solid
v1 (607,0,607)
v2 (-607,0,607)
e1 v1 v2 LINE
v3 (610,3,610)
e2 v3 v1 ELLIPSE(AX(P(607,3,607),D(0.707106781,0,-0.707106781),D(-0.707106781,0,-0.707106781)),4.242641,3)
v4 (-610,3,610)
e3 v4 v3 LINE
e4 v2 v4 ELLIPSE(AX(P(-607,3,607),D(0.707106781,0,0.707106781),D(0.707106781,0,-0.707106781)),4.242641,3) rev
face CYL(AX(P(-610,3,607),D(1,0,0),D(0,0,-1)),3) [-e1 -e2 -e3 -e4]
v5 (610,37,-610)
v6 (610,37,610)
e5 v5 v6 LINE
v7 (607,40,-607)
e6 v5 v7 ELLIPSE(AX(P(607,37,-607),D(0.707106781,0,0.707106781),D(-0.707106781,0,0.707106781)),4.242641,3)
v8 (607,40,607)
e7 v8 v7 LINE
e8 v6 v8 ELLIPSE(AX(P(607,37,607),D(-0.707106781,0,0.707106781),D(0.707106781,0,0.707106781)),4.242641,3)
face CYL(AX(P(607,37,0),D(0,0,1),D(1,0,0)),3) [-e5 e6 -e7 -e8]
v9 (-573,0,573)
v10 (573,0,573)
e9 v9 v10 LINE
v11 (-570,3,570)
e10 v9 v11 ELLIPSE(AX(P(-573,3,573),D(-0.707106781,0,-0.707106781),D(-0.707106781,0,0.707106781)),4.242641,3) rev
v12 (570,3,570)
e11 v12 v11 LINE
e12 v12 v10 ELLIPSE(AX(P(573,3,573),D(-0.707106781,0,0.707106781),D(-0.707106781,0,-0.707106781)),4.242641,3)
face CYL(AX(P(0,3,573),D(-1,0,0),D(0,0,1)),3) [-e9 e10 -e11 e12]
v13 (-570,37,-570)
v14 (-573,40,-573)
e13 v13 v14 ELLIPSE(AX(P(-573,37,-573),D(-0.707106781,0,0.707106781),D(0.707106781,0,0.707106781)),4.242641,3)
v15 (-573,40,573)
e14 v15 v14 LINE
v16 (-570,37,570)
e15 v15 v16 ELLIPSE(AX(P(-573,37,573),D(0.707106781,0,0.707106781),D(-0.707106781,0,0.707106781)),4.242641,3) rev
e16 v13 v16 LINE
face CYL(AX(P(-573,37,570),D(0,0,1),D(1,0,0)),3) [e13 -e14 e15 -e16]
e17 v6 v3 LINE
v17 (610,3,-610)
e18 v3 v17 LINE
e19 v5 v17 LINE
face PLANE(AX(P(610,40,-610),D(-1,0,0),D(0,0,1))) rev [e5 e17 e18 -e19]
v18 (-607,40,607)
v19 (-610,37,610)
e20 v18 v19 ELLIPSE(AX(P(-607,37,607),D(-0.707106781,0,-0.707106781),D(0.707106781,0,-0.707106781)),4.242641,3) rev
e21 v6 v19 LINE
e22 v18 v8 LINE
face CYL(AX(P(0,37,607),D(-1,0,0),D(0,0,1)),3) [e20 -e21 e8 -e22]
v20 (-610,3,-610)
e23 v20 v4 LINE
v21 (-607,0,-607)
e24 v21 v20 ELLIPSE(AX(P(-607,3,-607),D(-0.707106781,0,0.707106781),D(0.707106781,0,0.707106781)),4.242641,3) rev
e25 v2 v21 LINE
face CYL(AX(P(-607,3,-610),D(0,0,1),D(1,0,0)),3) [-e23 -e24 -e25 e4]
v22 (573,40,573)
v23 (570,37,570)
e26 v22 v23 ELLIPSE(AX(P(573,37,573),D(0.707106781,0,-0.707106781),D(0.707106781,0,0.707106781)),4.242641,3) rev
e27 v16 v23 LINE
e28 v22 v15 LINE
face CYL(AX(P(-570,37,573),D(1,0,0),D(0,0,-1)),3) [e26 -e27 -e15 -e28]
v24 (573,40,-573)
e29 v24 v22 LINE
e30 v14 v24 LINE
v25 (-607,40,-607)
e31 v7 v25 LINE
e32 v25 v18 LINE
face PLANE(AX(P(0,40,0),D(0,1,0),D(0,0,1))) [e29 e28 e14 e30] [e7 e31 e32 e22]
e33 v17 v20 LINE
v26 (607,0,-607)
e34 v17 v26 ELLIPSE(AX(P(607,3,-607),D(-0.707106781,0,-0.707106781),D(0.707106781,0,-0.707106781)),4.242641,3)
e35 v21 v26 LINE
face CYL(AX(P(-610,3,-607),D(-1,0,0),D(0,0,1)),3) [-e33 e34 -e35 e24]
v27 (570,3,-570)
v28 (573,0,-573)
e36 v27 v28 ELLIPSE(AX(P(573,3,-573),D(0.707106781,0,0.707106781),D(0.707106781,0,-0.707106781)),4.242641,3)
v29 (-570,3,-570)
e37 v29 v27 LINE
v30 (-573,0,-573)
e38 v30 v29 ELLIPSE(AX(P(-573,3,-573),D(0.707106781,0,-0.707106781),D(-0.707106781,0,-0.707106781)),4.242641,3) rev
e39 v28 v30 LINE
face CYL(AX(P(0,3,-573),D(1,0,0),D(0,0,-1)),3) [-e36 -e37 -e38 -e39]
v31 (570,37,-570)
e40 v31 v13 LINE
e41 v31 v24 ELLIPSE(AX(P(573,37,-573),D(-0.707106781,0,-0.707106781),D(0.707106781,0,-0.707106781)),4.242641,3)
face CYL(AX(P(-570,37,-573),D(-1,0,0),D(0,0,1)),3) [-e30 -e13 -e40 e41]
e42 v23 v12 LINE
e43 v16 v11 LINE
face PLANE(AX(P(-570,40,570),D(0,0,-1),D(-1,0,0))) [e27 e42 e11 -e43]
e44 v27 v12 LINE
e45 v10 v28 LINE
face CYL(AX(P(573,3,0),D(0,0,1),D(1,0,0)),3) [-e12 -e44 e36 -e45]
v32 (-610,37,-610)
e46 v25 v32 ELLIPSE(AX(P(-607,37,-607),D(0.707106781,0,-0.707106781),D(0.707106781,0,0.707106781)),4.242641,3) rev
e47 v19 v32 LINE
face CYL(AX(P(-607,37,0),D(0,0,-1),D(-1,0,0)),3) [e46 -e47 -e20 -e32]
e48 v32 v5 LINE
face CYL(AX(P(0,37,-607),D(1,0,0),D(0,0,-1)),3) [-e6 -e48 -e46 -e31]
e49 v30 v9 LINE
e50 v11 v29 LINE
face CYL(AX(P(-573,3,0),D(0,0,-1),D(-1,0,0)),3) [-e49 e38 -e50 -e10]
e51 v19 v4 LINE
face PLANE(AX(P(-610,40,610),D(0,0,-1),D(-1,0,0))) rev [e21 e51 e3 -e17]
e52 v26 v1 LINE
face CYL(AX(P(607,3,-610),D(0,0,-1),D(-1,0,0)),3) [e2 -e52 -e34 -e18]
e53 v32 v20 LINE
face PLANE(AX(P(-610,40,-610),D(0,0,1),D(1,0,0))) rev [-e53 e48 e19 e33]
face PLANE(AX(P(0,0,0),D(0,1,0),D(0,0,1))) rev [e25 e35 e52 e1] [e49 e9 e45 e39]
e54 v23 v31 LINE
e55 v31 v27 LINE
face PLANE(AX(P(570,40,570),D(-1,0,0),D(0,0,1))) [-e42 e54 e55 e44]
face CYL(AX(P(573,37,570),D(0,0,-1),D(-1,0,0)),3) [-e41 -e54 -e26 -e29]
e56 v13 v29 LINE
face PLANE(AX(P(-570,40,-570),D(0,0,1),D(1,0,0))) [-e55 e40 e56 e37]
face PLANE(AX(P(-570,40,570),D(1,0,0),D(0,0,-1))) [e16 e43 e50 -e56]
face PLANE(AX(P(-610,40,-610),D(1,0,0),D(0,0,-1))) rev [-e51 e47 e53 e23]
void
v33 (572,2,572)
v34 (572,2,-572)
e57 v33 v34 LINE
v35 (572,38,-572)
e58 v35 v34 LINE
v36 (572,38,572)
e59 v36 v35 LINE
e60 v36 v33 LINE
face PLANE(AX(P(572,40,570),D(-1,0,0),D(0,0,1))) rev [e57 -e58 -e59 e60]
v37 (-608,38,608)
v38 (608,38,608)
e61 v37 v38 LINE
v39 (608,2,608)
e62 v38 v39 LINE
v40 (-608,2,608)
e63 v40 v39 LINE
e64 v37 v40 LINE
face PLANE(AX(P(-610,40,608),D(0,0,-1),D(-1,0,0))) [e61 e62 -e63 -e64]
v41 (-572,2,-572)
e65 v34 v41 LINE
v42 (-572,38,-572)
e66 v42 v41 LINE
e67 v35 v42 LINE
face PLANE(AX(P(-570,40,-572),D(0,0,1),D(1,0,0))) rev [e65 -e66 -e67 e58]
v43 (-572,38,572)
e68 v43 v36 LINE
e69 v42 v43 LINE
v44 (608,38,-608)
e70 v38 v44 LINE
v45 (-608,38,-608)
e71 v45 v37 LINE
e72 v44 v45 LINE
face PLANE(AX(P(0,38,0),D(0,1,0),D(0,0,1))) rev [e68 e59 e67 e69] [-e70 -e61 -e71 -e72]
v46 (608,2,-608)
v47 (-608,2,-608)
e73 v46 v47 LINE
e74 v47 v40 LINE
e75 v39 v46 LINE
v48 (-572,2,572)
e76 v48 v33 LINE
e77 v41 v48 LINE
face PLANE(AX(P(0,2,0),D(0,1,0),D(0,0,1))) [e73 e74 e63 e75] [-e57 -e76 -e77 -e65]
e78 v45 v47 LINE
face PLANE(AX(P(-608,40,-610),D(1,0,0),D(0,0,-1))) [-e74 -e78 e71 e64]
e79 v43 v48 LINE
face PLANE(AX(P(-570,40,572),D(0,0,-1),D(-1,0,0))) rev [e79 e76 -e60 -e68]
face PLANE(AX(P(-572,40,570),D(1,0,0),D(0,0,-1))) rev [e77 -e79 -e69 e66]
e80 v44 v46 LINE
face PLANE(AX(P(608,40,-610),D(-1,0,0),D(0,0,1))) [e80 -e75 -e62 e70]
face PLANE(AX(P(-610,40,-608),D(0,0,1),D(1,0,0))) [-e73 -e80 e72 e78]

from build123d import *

# Parameters (mm, degrees)
SKETCH1_W           = 1220
SKETCH1_H           = 1220
SKETCH1_W_2         = 1140
SKETCH1_H_2         = 1140
BOSS_EXTRUDE1_DEPTH = 40
SHELL1_START        = 2
SHELL1_OUTLINE_W    = 1216
SHELL1_OUTLINE_H    = 1216
SHELL1_OUTLINE_W_2  = 1144
SHELL1_OUTLINE_H_2  = 1144
SHELL1_DEPTH        = 36
FILLET1_R           = 3


# Read off the part's stored shape, not the designer's step: Shell1
with BuildPart() as part:
    # Sketch1 → Boss-Extrude1 (new body)
    with BuildSketch(Plane(origin=(0, 0, 0), x_dir=(1, 0, 0), z_dir=(0, 1, 0))):
        Rectangle(SKETCH1_W, SKETCH1_H)
        Rectangle(SKETCH1_W_2, SKETCH1_H_2, mode=Mode.SUBTRACT)
    extrude(amount=BOSS_EXTRUDE1_DEPTH)

    # Shell1 outline → Shell1 (cut)
    with BuildSketch(Plane(origin=(0, 0, 0), x_dir=(1, 0, 0), z_dir=(0, 1, 0)).offset(SHELL1_START)):
        Rectangle(SHELL1_OUTLINE_W, SHELL1_OUTLINE_H)
        Rectangle(SHELL1_OUTLINE_W_2, SHELL1_OUTLINE_H_2, mode=Mode.SUBTRACT)
    extrude(amount=SHELL1_DEPTH, mode=Mode.SUBTRACT)

    # Fillet1
    fillet1_edges = [part.edges().sort_by_distance(p)[0] for p in [
        (-610, 40, 0),
        (0, 40, 610),
        (570, 0, 0),
        (0, 0, -570),
        (-570, 0, 0),
        (0, 0, 570),
        (570, 40, 0),
        (0, 40, -570),
        (-570, 40, 0),
        (0, 40, 570),
        (610, 40, 0),
        (0, 0, 610),
        (-610, 0, 0),
        (0, 0, -610),
        (610, 0, 0),
        (0, 40, -610),
    ]]
    fillet(fillet1_edges, radius=FILLET1_R)


solid = part.part
